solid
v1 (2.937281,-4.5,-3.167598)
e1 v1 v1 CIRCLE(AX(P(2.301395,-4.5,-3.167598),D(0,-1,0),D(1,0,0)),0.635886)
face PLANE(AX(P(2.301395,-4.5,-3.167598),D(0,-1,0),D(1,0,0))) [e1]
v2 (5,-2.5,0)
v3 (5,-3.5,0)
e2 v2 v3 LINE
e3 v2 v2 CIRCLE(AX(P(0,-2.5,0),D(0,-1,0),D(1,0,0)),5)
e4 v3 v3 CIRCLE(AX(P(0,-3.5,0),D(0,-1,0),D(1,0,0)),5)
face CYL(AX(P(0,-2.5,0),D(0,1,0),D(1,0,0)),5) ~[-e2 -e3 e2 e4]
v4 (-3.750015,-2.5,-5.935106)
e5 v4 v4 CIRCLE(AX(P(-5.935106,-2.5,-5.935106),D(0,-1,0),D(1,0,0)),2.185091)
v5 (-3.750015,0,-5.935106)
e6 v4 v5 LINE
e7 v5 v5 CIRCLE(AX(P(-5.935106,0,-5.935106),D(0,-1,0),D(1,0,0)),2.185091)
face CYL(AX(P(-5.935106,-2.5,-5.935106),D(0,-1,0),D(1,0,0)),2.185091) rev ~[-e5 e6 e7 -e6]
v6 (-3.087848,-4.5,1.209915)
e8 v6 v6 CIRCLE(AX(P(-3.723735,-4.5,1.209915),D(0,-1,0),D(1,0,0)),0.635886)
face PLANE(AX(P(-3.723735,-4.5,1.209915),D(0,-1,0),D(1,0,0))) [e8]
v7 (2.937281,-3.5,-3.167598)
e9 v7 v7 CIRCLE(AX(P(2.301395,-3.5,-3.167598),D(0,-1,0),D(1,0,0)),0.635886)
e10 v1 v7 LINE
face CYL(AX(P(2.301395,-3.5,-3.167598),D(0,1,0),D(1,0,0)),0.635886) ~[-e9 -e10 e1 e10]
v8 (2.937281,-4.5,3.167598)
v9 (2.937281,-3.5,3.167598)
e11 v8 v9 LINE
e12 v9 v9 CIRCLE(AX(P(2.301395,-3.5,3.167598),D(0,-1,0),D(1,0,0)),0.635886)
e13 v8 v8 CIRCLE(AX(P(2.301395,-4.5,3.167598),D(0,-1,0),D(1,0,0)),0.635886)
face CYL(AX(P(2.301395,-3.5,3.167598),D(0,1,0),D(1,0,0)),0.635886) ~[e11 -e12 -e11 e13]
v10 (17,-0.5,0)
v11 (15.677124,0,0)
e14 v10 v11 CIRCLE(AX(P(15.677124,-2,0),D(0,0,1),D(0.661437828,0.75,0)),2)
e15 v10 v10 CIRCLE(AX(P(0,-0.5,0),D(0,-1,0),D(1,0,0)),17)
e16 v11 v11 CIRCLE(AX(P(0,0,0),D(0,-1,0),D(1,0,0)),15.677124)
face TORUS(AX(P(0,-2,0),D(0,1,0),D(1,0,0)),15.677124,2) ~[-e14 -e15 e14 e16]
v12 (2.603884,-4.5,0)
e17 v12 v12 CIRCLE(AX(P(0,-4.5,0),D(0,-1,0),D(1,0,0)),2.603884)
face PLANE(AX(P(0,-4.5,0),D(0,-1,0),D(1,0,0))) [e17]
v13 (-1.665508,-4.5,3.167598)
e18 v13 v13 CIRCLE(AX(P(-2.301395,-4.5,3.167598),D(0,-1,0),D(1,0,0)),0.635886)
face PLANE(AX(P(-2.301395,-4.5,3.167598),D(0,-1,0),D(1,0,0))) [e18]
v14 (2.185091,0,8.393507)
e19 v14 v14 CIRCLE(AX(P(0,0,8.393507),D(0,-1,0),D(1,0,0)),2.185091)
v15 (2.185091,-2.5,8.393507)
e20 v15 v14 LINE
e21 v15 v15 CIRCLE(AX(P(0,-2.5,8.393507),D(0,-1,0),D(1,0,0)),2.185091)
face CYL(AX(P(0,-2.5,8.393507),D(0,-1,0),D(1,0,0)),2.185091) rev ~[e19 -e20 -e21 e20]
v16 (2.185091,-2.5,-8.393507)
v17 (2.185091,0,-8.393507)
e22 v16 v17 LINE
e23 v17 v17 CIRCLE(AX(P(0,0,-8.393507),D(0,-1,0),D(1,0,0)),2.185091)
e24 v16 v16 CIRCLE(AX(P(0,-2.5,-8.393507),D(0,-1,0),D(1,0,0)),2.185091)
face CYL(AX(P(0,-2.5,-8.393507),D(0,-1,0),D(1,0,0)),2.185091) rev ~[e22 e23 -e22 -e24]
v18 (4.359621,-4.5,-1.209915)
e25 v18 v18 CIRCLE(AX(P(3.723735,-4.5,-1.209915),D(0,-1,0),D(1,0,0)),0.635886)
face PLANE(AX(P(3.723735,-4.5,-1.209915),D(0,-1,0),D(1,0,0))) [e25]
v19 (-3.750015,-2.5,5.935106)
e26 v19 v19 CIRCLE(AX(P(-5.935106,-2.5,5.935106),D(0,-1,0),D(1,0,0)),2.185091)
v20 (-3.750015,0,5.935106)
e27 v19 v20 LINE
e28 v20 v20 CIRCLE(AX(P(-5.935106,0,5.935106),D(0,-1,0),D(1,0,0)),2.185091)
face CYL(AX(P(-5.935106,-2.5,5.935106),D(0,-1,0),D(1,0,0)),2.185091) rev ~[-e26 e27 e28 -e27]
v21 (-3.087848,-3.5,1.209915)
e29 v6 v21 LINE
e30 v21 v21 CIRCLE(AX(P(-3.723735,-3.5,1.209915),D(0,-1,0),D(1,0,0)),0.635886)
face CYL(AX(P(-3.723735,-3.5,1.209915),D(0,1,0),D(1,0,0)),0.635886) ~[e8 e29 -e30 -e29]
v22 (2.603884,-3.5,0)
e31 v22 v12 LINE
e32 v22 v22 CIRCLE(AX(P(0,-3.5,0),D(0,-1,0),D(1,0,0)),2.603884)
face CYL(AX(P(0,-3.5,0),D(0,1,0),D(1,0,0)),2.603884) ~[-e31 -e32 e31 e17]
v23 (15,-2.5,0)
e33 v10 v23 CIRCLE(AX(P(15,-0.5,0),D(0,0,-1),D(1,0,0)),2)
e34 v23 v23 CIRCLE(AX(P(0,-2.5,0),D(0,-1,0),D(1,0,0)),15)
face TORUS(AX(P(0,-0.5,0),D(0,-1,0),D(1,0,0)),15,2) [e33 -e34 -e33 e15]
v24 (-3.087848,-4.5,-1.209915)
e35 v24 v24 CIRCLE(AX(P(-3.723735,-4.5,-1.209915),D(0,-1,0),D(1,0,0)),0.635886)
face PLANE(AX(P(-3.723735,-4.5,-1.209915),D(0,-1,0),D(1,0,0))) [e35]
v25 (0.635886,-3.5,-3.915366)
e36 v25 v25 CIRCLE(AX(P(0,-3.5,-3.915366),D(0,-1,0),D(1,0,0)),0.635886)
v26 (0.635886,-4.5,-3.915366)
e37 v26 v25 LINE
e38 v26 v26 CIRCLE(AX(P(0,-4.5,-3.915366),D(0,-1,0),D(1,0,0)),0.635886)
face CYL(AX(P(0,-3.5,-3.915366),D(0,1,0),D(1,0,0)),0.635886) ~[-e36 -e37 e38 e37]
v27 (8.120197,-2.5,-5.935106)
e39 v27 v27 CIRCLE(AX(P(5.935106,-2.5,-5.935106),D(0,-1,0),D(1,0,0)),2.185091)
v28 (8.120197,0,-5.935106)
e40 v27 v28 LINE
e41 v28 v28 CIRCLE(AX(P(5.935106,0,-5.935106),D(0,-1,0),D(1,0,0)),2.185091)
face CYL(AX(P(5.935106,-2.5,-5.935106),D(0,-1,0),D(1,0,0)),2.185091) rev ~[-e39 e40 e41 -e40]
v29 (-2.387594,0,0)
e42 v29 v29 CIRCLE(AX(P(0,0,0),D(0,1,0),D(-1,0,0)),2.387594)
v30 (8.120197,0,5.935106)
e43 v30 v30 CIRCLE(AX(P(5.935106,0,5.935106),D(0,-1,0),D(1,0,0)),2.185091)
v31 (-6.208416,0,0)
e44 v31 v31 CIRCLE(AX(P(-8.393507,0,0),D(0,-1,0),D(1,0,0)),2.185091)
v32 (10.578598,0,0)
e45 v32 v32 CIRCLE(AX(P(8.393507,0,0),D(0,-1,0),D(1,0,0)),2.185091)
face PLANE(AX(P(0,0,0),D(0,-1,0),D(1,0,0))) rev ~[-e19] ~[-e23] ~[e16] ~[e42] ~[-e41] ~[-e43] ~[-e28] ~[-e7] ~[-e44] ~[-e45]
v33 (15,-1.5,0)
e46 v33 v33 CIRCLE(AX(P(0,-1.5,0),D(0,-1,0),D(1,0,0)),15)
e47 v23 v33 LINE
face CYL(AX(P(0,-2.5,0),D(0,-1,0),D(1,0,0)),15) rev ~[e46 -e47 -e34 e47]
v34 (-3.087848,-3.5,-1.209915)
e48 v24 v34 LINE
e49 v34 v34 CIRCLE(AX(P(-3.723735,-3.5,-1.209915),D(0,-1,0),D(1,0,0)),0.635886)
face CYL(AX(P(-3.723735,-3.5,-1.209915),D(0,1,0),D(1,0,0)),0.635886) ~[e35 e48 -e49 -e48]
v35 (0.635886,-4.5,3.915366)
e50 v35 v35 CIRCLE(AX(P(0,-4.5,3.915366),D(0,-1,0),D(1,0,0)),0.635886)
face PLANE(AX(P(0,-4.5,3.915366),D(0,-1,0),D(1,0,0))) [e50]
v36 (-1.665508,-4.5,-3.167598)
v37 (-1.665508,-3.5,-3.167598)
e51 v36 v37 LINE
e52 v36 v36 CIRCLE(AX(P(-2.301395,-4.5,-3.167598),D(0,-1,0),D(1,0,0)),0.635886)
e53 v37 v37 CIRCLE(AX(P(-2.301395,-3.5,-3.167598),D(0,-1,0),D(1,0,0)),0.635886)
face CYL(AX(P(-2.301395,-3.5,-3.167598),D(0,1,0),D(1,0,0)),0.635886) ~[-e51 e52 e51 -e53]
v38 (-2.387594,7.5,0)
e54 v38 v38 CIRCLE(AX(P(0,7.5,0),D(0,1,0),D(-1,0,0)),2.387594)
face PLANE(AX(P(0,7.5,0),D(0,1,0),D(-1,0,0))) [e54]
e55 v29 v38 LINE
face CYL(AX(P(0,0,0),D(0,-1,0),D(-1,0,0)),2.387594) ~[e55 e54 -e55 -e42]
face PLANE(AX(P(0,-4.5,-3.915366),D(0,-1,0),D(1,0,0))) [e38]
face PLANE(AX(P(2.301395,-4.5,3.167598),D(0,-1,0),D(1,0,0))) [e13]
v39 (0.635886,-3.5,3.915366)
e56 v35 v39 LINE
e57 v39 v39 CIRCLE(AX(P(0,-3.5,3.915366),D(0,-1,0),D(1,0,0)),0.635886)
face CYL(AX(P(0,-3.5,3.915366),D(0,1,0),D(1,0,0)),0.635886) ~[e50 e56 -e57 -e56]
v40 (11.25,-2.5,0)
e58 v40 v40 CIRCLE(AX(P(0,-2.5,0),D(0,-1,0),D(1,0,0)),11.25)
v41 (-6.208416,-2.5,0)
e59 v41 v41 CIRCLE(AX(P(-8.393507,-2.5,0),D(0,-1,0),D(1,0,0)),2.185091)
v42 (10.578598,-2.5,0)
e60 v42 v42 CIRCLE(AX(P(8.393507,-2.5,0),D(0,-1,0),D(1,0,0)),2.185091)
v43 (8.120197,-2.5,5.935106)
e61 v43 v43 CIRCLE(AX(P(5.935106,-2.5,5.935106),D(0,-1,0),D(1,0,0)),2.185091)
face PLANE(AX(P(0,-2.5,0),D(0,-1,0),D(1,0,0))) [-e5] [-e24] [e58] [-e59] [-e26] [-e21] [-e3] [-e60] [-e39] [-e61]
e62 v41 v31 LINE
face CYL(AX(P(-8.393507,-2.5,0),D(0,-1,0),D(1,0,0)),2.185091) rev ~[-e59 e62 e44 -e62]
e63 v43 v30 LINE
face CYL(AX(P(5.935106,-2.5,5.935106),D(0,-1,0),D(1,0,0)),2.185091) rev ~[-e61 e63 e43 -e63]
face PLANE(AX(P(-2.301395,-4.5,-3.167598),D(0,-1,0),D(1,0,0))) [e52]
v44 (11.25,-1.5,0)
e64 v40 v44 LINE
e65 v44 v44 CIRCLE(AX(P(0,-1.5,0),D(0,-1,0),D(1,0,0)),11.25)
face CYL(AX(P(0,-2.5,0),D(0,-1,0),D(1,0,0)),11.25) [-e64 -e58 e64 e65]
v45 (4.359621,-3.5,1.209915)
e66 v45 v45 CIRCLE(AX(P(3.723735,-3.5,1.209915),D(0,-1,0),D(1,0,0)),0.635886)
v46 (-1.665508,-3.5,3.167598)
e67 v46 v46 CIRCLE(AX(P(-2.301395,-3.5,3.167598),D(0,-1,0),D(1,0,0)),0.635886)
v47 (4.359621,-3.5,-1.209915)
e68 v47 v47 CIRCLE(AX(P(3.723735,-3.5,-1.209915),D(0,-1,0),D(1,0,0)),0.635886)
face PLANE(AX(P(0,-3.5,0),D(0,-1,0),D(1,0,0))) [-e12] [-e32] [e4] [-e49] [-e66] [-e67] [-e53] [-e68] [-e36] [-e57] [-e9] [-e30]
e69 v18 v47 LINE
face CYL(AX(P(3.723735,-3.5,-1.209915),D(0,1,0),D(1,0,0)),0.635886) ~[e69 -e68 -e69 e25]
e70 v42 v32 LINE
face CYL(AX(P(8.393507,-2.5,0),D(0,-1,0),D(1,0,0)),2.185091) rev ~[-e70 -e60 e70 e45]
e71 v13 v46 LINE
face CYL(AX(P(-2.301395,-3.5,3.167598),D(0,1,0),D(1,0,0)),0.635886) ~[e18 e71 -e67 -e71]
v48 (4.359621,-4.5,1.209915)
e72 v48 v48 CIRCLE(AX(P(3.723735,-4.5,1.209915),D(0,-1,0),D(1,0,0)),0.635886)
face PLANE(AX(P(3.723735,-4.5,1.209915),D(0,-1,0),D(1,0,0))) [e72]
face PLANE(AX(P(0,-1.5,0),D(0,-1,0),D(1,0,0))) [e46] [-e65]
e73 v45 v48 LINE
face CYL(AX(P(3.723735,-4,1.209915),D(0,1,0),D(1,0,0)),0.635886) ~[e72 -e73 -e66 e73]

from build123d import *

# Parameters (mm, degrees)
F0_R      = 17
F1_DEPTH  = 2.5
F2_R      = 2
F4_R      = 15
F4_R_2    = 11.25
F6_DEPTH  = 1
F5_R      = 5
F8_DEPTH  = 1
F7_R      = 2.1850910156
F9_DEPTH  = 25.4
F10_R     = 2.6038843179
F11_DEPTH = 1
F12_R     = 0.6358860885
F13_DEPTH = 0.5
F14_DEPTH = 0.5
F15_R     = 2.3875943528
F16_DEPTH = 7.5


# Not quite as in the source:
# - a fillet or chamfer that OpenCascade refuses, or shapes differently, is made with other operations: its cross-section is extruded or revolved along the edge and cut away or added


with BuildPart() as f1:
    # F0 (on Front) → F1 (new body)
    with BuildSketch(Plane.XZ):
        Circle(F0_R)
    extrude(amount=F1_DEPTH)

    # F2
    f2_edges = [f1.edges().sort_by_distance(p)[0] for p in [
        (-17, -2.5, 0),
    ]]
    fillet(f2_edges, radius=F2_R)

    # F3: fillet of radius 2 on 1 edges, made by hand

    # F3_s1 → F3_t2 (revolve, cut)
    with BuildSketch(Plane.XY):
        with BuildLine():
            ThreePointArc((17, -0.5), (16.3842311257, -0.1291713066), (15.6771243445, 0))
            Line((15.6771243445, 0), (17, 0))
            Line((17, 0), (17, -0.5))
        make_face()
    revolve(axis=Axis((0, 0, 0), (0, -1, 0)), mode=Mode.SUBTRACT)

    # F4 (on face) → F6 (cut)
    with BuildSketch(Plane.XZ.offset(2.5)):
        Circle(F4_R)
        Circle(F4_R_2, mode=Mode.SUBTRACT)
    extrude(amount=-F6_DEPTH, mode=Mode.SUBTRACT)

    # F5 (on face) → F8 (join)
    with BuildSketch(Plane.XZ.offset(2.5)):
        Circle(F5_R)
    extrude(amount=F8_DEPTH)

    # F7 (on face) → F9 (cut)
    with BuildSketch(Plane.XZ.offset(2.5)):
        with Locations((0, 8.3935074508)):
            Circle(F7_R)
        with Locations((5.9351060364, 5.9351060364)):
            Circle(F7_R)
        with Locations((8.3935074508, 0)):
            Circle(F7_R)
        with Locations((5.9351060364, -5.9351060364)):
            Circle(F7_R)
        with Locations((0, -8.3935074508)):
            Circle(F7_R)
        with Locations((-5.9351060364, -5.9351060364)):
            Circle(F7_R)
        with Locations((-8.3935074508, 0)):
            Circle(F7_R)
        with Locations((-5.9351060364, 5.9351060364)):
            Circle(F7_R)
    extrude(amount=-F9_DEPTH, mode=Mode.SUBTRACT)

    # F10 (on face) → F11 (join)
    with BuildSketch(Plane.XZ.offset(3.5)):
        Circle(F10_R)
    extrude(amount=F11_DEPTH)

    # F12 (on face) → F13 (join)
    with BuildSketch(Plane.XZ.offset(3.5)):
        with Locations((-2.3013945397, 3.1675978363)):
            Circle(F12_R)
        with Locations((0, 3.915366251)):
            Circle(F12_R)
        with Locations((2.3013945397, 3.1675978363)):
            Circle(F12_R)
        with Locations((3.7237345867, 1.2099147108)):
            Circle(F12_R)
        with Locations((3.7237345867, -1.2099147108)):
            Circle(F12_R)
        with Locations((2.3013945397, -3.1675978363)):
            Circle(F12_R)
        with Locations((0, -3.915366251)):
            Circle(F12_R)
        with Locations((-2.3013945397, -3.1675978363)):
            Circle(F12_R)
        with Locations((-3.7237345867, -1.2099147108)):
            Circle(F12_R)
        with Locations((-3.7237345867, 1.2099147108)):
            Circle(F12_R)
    extrude(amount=F13_DEPTH)

    # F14 (add): faces of the model
    f14_faces = [f1.faces().sort_by_distance(p)[0] for p in [
        (3.7237345867, -4, 1.2099147108),
        (2.3013945397, -4, 3.1675978363),
        (0, -4, 3.915366251),
        (-2.3013945397, -4, 3.1675978363),
        (-3.7237345867, -4, 1.2099147108),
        (-3.7237345867, -4, -1.2099147108),
        (-2.3013945397, -4, -3.1675978363),
        (0, -4, -3.915366251),
        (2.3013945397, -4, -3.1675978363),
        (3.7237345867, -4, -1.2099147108),
    ]]
    extrude(f14_faces, amount=F14_DEPTH)

    # F15 (on face) → F16 (join)
    with BuildSketch(Plane(origin=(0, 0, 0), x_dir=(-1, 0, 0), z_dir=(0, 1, 0))):
        Circle(F15_R)
    extrude(amount=F16_DEPTH)


solid = f1.part
